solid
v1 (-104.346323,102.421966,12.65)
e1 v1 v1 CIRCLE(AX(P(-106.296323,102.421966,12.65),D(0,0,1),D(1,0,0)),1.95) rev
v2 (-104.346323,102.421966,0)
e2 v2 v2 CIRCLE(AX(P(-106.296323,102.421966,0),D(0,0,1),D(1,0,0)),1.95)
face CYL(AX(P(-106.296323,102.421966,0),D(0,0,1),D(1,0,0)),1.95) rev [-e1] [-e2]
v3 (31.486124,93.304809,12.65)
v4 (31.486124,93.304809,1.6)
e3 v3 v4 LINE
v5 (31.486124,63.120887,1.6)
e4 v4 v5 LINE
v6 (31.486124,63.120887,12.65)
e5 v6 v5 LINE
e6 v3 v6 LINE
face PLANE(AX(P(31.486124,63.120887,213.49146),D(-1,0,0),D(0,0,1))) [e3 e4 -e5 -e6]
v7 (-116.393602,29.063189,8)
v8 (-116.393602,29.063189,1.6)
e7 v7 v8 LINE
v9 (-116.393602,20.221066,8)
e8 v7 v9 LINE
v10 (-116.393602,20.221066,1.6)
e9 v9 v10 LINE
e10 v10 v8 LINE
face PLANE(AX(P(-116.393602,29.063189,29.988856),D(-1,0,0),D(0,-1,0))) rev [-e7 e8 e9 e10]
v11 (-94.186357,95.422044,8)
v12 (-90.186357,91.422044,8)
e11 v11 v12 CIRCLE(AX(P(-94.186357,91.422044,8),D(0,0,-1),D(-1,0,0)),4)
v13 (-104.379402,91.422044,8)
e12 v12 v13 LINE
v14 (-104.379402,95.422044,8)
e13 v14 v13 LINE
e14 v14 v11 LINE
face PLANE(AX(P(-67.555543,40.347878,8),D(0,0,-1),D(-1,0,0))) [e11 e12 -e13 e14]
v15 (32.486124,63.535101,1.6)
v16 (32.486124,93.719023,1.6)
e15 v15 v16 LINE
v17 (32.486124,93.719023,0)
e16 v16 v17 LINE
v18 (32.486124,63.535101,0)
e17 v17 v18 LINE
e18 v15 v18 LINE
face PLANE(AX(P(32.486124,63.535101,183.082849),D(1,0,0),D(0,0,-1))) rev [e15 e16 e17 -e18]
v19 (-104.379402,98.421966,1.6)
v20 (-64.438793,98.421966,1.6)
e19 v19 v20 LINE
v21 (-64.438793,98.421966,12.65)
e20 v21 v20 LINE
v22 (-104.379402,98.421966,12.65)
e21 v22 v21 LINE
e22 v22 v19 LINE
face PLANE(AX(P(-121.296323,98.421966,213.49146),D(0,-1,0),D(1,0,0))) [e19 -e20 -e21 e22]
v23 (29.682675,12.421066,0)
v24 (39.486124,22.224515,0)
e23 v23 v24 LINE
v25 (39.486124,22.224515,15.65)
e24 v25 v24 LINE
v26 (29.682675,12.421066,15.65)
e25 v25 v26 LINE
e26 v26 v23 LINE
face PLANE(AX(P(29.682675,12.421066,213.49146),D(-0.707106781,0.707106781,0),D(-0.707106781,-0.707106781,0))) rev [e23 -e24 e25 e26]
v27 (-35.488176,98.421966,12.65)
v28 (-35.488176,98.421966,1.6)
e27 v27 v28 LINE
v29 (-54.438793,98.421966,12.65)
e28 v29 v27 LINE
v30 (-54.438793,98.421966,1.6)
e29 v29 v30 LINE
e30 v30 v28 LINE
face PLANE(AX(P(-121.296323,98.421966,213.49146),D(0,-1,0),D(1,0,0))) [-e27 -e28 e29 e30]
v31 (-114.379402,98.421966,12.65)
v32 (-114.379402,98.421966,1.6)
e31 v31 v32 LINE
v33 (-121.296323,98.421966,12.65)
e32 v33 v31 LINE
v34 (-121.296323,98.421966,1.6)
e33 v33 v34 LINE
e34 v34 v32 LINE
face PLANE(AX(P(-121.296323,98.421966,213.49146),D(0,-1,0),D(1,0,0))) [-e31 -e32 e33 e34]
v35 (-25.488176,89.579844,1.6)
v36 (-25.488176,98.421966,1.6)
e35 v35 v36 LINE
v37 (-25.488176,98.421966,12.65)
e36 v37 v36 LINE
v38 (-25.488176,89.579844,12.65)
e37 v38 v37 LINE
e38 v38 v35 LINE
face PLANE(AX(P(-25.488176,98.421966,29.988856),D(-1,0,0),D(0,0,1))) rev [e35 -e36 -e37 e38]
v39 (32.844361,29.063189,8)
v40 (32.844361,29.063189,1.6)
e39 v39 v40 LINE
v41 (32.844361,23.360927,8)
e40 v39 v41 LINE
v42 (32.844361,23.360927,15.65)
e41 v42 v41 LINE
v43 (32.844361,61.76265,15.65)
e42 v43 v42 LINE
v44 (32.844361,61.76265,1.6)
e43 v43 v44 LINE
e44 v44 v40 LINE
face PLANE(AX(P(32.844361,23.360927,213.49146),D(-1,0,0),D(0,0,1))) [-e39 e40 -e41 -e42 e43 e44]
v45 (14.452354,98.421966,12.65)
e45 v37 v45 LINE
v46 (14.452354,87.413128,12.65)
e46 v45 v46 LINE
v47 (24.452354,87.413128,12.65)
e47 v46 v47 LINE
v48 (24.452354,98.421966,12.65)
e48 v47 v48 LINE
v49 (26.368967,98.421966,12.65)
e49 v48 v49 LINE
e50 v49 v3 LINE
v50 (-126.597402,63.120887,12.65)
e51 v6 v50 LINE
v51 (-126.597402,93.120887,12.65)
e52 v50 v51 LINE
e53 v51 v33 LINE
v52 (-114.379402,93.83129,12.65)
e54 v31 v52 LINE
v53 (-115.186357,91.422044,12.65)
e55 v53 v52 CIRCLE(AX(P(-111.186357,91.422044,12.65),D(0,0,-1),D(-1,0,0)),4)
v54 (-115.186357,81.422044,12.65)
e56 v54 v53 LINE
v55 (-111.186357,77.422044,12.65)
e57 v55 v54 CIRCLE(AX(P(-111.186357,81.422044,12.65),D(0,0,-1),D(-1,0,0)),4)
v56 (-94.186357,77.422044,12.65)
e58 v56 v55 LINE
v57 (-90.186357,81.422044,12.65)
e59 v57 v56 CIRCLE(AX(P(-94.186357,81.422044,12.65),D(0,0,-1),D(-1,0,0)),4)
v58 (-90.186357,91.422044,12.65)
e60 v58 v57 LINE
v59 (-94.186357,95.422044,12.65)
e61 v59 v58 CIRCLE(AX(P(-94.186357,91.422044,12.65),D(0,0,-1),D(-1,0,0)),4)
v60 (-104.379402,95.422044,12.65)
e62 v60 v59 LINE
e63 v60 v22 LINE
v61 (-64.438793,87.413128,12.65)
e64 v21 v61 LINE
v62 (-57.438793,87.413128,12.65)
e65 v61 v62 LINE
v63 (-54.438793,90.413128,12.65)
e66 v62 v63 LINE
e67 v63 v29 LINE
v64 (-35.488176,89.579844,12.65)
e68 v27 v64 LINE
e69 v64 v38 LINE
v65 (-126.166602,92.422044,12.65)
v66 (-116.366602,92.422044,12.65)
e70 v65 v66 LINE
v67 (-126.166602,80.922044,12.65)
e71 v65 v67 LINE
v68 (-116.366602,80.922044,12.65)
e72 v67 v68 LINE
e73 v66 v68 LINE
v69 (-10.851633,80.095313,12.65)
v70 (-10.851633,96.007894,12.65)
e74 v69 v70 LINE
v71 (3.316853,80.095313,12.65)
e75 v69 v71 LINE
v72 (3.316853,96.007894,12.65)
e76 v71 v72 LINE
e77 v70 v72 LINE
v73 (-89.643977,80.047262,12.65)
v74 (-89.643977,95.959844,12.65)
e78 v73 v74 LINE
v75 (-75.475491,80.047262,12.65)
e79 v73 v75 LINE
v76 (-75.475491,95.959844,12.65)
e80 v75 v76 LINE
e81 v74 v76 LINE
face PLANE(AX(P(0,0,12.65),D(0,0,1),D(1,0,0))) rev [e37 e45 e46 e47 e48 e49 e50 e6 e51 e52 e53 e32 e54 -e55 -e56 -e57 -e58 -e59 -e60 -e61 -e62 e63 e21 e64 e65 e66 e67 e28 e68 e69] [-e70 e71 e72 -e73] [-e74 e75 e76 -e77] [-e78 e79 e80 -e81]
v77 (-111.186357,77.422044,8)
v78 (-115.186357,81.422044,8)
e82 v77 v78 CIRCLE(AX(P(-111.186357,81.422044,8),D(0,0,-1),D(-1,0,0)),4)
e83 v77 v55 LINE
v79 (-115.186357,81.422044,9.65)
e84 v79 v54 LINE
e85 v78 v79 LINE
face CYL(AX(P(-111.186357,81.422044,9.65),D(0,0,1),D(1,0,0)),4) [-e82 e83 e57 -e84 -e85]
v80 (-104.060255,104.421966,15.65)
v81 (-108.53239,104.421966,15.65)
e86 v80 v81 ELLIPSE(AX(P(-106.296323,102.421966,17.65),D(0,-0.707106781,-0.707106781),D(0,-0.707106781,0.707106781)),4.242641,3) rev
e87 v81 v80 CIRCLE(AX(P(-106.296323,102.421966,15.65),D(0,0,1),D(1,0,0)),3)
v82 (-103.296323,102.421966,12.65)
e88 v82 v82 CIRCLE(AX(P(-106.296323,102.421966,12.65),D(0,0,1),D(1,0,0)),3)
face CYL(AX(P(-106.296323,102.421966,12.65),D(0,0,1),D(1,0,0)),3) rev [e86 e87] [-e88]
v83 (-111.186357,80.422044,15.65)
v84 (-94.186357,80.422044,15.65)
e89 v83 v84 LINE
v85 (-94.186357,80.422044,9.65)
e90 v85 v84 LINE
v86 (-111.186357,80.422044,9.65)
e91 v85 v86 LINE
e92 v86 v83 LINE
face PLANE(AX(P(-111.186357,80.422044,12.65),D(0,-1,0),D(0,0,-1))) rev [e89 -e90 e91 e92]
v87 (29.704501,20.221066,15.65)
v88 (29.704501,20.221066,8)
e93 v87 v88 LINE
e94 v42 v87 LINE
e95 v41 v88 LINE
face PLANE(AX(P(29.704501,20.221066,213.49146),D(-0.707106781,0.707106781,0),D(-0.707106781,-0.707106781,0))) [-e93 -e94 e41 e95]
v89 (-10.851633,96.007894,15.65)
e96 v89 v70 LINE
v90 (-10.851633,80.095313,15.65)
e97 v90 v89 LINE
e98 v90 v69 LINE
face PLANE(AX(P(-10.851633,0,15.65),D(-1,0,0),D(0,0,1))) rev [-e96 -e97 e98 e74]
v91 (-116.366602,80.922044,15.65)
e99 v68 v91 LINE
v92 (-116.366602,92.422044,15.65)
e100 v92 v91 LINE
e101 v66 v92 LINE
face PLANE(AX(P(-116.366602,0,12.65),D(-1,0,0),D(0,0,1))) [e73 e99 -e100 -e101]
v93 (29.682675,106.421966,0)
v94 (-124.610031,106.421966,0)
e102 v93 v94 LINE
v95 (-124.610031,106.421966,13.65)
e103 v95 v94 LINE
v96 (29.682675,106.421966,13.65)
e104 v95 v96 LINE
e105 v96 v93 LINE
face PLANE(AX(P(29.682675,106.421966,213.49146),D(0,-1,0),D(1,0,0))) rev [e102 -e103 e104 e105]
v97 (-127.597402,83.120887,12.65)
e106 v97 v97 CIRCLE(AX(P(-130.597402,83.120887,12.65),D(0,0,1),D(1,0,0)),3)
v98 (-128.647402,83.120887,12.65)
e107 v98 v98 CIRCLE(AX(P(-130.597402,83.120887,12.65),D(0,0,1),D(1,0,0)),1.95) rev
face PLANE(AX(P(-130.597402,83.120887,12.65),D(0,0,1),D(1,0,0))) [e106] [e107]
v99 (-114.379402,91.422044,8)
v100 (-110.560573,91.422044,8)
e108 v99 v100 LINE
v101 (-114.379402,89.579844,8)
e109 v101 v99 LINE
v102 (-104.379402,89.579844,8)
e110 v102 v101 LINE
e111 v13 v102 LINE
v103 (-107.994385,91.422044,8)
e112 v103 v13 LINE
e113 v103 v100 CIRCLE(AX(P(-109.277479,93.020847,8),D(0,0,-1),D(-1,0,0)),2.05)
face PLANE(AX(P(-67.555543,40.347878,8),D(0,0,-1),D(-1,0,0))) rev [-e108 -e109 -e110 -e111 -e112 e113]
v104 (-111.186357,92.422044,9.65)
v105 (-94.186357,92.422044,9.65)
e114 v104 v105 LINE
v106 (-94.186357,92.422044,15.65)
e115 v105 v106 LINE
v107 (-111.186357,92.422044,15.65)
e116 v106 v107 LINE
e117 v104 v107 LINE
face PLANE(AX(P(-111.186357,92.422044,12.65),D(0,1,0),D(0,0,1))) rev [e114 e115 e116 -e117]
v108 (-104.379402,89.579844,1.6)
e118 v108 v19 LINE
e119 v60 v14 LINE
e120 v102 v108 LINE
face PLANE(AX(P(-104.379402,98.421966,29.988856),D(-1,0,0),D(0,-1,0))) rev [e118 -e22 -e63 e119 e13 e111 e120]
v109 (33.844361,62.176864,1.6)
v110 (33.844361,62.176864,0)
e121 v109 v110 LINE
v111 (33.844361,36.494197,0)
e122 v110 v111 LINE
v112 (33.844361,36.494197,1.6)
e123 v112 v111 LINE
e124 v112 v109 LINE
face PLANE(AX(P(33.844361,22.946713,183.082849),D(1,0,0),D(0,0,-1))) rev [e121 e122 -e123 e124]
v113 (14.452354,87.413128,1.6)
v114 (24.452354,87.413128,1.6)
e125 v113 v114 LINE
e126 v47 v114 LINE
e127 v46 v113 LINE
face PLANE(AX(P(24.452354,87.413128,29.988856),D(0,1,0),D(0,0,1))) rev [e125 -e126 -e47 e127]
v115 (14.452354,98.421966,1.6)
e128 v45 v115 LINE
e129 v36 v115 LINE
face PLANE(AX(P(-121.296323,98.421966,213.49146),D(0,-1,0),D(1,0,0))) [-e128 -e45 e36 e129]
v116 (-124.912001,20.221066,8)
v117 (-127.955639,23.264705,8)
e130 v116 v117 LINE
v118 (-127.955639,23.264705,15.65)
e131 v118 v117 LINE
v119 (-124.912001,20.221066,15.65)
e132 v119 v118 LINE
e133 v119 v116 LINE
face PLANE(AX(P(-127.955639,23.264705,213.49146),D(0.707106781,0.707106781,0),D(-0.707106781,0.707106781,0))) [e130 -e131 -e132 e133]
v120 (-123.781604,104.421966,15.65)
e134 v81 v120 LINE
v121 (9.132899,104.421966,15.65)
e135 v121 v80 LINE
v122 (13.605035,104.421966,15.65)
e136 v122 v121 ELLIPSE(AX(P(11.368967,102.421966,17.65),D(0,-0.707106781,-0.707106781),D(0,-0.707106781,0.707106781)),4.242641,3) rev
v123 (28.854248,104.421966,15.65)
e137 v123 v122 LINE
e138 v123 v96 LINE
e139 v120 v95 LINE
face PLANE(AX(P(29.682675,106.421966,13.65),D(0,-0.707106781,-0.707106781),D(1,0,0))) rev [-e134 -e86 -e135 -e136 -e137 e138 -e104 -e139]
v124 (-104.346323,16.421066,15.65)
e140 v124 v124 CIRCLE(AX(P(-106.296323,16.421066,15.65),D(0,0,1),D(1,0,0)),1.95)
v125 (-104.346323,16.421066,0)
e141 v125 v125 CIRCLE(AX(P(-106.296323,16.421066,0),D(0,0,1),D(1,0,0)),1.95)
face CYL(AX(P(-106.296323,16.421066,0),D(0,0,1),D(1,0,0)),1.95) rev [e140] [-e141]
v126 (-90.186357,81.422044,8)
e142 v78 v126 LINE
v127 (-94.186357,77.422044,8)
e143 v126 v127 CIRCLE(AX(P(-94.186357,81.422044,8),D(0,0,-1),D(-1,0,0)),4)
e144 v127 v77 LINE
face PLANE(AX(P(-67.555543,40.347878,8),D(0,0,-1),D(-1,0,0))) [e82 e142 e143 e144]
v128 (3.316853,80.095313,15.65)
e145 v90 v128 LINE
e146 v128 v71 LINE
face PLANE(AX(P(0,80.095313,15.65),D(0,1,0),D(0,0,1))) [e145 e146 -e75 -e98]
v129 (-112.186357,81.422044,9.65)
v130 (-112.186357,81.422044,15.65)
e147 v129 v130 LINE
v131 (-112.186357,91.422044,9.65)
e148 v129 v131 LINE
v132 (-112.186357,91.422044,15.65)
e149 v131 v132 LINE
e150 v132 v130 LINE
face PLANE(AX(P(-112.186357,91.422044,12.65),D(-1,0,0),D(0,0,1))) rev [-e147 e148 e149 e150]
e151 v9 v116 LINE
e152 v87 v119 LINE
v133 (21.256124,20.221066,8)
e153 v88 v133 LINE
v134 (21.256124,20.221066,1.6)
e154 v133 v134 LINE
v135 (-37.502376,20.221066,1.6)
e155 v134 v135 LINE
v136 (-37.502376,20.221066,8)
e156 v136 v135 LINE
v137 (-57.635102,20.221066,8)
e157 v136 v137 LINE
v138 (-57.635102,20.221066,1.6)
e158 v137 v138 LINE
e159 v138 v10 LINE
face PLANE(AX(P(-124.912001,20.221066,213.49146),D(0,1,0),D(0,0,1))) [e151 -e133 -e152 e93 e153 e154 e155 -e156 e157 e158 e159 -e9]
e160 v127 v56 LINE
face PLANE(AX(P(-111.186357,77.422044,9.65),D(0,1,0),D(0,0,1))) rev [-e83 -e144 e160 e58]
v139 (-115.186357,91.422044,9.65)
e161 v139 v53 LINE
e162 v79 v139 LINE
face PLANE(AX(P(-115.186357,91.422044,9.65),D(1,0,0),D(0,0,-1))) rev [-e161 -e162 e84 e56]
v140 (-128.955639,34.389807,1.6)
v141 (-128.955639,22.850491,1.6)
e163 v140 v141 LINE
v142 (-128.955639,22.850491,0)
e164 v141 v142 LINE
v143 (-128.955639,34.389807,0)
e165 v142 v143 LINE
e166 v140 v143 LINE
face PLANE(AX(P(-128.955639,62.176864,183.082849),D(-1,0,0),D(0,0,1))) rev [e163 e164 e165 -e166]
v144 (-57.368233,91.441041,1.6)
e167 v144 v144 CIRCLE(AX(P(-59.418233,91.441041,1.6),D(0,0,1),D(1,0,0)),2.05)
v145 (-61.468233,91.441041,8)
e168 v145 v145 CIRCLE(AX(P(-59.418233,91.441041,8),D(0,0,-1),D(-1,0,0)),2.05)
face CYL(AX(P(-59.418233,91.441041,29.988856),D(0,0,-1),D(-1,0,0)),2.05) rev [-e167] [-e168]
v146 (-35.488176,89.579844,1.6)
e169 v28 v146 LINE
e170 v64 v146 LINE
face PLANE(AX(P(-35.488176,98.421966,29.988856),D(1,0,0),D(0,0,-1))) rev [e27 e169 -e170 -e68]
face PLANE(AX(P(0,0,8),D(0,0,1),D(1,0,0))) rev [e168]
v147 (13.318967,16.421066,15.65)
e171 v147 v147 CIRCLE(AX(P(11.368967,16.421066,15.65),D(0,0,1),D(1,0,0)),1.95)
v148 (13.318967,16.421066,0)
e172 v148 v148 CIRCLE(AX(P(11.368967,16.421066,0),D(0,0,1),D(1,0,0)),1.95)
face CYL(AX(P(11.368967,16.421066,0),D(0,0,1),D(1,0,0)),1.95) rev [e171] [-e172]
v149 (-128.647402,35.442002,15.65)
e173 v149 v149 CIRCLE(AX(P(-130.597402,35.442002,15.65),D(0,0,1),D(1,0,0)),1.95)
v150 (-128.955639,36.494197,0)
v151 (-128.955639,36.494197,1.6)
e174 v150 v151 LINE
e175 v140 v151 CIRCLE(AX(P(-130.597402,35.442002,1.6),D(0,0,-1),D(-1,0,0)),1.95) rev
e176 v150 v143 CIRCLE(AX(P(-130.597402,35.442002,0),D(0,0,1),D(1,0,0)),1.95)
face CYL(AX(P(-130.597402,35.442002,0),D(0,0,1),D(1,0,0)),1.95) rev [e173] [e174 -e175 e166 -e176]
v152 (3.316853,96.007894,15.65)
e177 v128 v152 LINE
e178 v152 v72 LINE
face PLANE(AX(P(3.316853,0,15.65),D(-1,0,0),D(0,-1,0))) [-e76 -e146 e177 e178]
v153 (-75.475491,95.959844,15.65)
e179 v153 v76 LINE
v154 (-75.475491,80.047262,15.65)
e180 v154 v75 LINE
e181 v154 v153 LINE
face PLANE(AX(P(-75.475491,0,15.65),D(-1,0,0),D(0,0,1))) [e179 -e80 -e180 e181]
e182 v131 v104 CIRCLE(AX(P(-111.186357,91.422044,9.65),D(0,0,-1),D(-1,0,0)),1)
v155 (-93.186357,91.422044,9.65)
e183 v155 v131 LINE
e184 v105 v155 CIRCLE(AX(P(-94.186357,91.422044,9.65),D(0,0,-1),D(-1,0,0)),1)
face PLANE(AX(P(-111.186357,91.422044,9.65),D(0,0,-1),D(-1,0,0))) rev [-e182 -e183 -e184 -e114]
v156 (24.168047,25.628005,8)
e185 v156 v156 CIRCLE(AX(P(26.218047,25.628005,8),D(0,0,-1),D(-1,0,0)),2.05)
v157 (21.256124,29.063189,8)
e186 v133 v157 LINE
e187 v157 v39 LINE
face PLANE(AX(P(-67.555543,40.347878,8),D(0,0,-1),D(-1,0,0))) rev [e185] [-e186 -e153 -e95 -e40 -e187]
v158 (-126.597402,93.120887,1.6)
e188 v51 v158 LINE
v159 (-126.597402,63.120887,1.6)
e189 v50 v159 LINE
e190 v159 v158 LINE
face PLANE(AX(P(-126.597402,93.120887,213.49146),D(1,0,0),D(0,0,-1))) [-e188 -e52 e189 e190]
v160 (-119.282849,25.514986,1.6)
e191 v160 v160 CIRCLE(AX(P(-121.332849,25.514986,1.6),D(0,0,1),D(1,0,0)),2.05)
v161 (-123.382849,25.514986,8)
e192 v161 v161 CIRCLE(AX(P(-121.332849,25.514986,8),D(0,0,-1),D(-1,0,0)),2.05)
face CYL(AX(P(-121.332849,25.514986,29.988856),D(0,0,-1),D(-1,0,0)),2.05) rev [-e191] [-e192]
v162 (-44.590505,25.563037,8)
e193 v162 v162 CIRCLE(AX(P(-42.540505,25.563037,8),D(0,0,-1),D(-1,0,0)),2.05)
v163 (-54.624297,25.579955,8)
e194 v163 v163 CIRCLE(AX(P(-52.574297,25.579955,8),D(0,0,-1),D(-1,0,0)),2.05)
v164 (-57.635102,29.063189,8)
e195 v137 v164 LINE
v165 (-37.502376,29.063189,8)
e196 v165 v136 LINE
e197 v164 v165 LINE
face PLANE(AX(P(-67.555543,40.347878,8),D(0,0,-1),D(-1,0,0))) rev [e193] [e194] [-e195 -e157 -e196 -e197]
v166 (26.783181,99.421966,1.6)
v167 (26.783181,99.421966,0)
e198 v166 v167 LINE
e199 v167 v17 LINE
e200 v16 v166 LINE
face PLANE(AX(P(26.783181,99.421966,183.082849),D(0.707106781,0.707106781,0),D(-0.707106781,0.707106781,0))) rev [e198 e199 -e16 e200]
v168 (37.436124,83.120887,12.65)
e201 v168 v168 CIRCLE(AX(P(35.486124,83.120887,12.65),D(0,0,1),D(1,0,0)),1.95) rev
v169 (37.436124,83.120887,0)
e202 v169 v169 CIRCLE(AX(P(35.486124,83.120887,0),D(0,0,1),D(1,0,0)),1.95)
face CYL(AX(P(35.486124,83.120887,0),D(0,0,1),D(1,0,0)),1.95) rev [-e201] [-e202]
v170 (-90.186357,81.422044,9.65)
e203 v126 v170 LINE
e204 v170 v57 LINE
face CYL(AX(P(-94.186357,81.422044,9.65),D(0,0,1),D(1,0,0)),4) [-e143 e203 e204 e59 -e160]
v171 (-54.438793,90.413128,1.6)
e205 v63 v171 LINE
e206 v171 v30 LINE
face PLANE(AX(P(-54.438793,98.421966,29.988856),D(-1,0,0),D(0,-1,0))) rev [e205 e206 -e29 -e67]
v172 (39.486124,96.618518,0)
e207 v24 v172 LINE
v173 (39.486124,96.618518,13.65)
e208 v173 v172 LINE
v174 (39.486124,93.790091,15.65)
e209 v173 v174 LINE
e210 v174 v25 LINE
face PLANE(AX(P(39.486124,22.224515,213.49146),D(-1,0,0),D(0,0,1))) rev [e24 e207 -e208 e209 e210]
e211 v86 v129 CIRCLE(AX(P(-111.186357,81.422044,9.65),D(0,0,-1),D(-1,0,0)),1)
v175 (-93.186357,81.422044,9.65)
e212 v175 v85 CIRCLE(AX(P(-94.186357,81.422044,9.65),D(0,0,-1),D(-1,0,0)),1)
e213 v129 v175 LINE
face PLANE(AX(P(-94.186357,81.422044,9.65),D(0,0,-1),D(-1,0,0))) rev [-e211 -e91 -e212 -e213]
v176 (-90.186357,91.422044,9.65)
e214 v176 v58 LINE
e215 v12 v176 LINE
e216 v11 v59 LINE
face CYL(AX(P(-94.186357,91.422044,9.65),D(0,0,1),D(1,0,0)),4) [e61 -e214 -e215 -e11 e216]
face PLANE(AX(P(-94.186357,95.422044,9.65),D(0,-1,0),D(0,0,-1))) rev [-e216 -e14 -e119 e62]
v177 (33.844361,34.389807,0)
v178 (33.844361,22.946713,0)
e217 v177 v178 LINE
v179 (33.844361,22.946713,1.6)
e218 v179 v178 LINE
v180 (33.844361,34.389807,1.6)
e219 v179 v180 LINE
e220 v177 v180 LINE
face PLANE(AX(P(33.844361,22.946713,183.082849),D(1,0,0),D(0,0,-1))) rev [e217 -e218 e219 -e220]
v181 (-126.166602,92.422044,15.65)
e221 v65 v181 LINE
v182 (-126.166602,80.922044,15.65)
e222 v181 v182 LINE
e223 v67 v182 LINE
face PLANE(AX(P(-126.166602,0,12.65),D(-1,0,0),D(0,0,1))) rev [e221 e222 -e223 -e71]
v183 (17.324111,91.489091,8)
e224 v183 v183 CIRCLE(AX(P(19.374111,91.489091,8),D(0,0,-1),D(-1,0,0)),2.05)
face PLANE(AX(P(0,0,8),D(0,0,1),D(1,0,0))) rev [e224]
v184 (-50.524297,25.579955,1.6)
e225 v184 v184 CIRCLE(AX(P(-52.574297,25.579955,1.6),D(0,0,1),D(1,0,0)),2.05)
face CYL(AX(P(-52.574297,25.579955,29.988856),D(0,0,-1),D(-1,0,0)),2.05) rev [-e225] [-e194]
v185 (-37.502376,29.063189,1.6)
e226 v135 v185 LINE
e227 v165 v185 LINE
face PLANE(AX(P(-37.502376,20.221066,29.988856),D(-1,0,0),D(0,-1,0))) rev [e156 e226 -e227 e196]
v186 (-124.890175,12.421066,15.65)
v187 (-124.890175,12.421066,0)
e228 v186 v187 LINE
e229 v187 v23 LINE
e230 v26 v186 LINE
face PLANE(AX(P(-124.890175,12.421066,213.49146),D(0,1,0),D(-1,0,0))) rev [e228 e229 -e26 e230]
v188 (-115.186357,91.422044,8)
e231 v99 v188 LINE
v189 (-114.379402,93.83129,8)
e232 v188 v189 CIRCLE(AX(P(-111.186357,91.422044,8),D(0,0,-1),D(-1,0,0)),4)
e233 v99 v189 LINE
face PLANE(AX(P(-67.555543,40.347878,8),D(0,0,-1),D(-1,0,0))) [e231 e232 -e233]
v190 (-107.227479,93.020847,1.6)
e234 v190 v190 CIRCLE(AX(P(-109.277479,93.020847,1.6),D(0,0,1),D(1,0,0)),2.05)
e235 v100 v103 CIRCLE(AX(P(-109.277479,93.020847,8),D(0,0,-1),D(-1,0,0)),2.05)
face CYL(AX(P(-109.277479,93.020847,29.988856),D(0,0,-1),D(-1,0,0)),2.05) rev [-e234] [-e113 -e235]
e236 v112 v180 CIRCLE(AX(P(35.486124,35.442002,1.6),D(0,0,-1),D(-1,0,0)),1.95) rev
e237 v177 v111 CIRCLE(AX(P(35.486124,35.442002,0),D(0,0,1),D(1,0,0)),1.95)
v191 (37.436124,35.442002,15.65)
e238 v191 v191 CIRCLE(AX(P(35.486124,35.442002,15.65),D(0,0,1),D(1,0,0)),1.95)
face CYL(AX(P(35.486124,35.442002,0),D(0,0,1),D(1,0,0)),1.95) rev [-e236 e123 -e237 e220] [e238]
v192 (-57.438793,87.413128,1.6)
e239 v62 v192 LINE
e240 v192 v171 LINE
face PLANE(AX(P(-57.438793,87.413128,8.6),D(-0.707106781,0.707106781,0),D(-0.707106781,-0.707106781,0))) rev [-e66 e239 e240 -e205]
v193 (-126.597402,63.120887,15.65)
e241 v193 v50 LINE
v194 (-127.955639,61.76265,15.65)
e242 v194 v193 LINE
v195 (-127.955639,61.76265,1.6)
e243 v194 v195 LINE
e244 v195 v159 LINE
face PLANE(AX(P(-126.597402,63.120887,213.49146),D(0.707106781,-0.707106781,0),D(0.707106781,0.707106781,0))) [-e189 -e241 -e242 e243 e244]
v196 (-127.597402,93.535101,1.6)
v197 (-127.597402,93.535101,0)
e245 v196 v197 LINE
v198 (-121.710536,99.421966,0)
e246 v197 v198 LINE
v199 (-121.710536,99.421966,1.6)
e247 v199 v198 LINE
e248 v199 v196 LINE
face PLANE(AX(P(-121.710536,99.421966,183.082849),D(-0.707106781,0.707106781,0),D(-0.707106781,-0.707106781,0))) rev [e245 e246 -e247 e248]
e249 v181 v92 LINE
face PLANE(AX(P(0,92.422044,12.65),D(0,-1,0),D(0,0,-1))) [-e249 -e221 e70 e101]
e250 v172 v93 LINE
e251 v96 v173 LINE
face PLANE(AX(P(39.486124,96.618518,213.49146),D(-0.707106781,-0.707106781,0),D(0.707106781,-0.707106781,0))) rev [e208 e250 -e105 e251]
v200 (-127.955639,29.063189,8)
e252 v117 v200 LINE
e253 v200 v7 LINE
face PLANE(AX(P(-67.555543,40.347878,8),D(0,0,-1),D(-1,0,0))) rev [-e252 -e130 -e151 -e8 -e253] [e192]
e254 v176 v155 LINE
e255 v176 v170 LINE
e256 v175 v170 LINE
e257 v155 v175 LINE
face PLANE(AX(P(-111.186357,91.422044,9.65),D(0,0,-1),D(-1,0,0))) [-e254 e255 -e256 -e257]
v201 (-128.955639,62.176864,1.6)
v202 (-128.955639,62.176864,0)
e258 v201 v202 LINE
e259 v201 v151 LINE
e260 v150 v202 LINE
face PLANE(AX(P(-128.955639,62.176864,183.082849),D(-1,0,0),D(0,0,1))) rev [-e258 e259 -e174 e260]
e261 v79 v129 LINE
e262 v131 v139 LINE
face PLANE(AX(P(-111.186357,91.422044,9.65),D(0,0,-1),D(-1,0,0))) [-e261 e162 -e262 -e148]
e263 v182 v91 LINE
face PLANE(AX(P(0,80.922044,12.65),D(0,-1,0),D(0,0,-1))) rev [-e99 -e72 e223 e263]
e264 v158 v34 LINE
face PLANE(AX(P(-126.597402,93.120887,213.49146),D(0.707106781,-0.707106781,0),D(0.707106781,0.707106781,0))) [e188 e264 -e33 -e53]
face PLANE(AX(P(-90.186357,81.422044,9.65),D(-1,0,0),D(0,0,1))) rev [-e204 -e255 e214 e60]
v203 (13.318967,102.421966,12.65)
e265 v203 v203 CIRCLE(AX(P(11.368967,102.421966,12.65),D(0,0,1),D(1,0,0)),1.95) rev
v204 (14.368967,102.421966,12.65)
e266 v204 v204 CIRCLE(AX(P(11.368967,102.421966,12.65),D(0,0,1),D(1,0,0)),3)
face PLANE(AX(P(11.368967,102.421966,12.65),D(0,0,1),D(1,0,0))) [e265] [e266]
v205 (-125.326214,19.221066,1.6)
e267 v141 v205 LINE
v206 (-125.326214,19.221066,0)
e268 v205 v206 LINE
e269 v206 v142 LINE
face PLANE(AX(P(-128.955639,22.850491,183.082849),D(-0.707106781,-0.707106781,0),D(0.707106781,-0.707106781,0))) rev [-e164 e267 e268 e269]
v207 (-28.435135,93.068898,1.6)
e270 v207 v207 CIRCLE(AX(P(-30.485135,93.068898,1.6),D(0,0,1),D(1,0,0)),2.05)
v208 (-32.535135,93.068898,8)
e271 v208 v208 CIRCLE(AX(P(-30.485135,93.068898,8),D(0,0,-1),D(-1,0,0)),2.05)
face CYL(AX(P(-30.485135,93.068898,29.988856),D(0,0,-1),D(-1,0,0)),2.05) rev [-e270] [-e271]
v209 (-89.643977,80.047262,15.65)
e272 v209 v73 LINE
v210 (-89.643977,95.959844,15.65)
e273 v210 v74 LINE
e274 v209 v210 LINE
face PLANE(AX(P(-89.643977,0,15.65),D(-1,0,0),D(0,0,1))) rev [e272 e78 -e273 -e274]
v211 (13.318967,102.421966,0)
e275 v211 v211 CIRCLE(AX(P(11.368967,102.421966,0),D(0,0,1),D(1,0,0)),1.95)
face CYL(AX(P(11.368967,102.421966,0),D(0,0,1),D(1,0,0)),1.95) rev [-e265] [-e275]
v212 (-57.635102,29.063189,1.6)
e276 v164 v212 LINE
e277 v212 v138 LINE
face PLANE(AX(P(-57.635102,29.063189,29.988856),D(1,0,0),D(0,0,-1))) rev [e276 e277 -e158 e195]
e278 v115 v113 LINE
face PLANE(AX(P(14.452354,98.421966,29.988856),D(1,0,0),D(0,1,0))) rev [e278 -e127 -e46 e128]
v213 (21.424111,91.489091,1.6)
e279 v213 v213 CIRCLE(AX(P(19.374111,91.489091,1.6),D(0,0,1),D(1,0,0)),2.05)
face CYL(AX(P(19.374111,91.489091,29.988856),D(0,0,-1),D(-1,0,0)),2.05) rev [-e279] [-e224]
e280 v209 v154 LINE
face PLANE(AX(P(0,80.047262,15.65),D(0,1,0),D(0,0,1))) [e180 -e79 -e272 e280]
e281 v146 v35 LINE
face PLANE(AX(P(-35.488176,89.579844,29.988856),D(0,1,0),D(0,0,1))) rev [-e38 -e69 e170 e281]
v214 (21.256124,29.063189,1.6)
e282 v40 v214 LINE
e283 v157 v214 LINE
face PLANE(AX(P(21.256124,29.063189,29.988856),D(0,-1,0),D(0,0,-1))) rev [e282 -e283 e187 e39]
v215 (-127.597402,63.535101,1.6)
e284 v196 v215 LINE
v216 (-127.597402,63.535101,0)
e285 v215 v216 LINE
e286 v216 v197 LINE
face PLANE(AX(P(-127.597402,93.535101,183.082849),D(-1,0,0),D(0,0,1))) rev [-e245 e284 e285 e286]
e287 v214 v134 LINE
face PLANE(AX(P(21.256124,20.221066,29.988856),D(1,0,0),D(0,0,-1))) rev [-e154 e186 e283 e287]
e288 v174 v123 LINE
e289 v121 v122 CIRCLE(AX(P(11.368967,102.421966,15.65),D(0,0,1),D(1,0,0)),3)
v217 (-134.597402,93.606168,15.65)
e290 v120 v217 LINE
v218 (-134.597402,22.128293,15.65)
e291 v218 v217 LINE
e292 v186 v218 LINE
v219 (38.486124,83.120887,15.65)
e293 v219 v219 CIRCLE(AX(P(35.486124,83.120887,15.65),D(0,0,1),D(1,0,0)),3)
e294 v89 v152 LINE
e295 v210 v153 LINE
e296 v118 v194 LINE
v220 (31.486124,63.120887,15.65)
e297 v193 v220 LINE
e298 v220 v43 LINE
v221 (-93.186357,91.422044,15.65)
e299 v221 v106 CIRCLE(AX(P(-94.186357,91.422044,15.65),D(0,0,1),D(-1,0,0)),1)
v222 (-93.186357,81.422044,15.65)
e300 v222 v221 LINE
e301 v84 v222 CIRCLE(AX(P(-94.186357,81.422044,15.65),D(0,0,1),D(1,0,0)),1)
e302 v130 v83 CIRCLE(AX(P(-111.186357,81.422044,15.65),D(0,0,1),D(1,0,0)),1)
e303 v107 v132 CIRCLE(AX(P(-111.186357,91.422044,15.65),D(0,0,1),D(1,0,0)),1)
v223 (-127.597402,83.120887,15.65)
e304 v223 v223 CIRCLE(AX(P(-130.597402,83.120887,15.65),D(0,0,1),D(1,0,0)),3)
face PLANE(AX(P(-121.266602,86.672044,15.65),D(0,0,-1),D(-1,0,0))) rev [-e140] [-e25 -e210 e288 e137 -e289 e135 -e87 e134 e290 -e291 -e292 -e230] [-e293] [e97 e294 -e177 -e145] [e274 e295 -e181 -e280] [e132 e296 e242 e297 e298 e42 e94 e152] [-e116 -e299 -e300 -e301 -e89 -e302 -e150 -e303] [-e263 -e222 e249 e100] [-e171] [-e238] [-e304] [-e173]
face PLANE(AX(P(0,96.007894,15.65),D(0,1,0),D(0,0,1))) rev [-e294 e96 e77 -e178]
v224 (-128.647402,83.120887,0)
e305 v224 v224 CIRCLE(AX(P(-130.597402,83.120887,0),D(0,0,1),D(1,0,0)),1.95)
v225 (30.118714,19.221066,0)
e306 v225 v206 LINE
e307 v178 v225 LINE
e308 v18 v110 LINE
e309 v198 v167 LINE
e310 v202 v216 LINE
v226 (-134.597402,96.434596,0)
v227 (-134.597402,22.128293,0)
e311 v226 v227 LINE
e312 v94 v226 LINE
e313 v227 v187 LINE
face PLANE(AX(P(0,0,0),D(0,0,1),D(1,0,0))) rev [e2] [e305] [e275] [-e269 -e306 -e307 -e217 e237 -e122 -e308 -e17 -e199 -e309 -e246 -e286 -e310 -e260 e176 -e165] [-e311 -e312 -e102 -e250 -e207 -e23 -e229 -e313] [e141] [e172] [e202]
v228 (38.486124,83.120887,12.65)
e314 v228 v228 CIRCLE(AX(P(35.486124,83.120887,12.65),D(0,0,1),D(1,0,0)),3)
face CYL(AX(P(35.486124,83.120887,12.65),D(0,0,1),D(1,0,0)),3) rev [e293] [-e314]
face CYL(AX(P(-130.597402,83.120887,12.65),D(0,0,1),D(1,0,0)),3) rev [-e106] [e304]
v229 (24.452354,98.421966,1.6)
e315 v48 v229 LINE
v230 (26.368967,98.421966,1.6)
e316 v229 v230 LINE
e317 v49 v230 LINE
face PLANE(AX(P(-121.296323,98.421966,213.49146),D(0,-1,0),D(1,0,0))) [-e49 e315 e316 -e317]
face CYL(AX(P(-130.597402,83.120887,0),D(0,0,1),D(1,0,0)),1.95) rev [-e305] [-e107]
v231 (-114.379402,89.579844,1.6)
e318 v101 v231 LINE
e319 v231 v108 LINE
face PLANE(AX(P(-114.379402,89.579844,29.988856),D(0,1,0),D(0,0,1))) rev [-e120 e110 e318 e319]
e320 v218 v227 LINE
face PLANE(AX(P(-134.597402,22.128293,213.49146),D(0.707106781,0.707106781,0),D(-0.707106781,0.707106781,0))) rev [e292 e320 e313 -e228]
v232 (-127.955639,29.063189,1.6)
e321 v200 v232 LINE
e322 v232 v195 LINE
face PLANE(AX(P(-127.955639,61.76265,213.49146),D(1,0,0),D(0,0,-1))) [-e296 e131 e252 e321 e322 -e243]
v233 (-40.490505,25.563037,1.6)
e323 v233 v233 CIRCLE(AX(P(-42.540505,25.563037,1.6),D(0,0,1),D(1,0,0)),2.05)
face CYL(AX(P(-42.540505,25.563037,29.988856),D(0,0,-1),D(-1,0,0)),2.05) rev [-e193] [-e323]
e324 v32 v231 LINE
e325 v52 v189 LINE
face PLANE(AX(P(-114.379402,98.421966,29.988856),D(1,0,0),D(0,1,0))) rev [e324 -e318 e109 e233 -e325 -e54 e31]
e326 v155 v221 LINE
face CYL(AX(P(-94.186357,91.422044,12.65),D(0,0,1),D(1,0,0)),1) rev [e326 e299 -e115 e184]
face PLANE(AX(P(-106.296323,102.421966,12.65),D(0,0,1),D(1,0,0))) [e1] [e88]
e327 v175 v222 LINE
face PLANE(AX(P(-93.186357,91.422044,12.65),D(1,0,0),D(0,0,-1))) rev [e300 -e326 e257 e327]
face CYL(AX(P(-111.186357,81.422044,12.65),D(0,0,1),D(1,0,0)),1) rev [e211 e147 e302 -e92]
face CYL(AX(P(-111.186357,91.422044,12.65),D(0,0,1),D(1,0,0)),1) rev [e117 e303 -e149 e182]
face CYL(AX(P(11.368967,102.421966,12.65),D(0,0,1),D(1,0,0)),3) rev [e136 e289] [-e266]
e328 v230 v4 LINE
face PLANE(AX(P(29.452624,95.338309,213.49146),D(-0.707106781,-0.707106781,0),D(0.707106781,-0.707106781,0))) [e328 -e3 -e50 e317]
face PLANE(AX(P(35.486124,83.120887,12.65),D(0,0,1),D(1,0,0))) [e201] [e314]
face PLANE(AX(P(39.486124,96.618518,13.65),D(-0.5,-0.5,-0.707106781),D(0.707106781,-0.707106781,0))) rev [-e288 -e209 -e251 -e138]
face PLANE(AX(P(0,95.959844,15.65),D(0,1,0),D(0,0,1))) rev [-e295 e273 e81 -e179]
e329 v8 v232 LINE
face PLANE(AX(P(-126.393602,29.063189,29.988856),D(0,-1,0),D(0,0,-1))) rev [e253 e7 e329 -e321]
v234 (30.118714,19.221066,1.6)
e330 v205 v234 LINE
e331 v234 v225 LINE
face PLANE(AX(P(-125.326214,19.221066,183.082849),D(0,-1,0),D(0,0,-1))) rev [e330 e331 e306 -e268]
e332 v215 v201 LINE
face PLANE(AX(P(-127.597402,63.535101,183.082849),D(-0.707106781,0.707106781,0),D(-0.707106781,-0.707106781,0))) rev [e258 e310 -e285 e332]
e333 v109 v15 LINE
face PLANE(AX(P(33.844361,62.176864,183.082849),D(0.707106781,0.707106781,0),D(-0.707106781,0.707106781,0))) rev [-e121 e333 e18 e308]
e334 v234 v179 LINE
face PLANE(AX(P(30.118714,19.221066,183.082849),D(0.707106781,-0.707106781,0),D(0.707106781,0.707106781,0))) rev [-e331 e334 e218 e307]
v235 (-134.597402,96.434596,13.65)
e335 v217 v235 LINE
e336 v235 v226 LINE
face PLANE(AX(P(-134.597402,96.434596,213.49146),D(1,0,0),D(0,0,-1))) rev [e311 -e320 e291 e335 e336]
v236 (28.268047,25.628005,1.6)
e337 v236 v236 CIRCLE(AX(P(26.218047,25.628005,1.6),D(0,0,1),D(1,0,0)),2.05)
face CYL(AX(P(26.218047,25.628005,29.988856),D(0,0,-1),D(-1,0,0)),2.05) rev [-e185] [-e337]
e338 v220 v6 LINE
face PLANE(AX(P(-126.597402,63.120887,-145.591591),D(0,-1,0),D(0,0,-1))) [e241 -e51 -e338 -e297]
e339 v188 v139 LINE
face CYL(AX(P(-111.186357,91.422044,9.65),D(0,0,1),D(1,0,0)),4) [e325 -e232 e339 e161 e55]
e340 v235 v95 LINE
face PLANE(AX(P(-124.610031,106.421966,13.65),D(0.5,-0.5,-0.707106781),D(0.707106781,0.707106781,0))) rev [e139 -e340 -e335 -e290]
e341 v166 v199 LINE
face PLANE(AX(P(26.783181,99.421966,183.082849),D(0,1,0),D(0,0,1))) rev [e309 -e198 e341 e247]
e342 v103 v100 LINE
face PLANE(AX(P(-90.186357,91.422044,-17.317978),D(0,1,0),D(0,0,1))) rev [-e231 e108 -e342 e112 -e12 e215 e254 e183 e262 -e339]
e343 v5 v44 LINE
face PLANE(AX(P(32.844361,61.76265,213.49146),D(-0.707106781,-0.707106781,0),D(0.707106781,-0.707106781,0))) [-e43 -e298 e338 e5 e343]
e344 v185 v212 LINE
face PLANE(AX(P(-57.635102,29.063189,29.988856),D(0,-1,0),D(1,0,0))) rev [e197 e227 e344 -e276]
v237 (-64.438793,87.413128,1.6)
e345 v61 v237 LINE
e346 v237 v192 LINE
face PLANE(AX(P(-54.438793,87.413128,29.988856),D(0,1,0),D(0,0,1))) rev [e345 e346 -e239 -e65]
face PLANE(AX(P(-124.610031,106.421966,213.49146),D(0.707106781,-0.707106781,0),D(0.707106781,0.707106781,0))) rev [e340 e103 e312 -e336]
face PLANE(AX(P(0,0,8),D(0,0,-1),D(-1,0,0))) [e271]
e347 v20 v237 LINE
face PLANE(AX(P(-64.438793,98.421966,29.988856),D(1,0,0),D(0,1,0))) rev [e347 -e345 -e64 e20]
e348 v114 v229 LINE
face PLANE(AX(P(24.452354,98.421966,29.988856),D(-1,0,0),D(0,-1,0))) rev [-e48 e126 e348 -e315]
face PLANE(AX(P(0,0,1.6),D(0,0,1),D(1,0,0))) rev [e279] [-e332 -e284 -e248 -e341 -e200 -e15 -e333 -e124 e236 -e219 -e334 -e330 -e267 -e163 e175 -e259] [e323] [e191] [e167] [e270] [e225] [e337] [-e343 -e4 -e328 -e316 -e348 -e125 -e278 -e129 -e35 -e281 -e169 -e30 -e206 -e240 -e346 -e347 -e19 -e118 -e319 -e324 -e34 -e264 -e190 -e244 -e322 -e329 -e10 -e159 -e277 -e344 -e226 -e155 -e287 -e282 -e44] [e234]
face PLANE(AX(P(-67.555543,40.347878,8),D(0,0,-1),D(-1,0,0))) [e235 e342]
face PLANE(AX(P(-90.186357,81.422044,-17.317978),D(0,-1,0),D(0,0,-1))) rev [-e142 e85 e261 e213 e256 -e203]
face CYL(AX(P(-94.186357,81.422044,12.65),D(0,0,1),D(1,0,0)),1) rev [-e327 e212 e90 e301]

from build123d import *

# Parameters (mm, degrees)
EXTRUDE_1_DEPTH     = 15.65
SKETCH_4_W          = 9.8
SKETCH_4_H          = 11.5
SKETCH_4_W_2        = 12.96
SKETCH_4_H_2        = 14.97
EXTRUDE_4_DEPTH     = 3
SKETCH_5_R          = 1.95
CUT_EXTRUDE_1_DEPTH = 173.299210828
SKETCH_6_R          = 3
CUT_EXTRUDE_2_DEPTH = 3
SKETCH_9_W          = 10
SKETCH_9_H          = 8.842122099
SKETCH_9_R          = 2.05
SKETCH_9_H_2        = 11.008838114
EXTRUDE_5_DEPTH     = 6.4
CUT_EXTRUDE_3_DEPTH = 3
EXTRUDE_6_DEPTH     = 3
EXTRUDE_7_DEPTH     = 1.65
CHAMFER_2_SIZE      = 2
CUT_EXTRUDE_4_DEPTH = 1.6
SKETCH_14_W         = 158.083526154
SKETCH_14_H         = 7.071067811
EXTRUDE_8_DEPTH     = 3
CUT_EXTRUDE_5_DEPTH = 7
EXTRUDE_START       = 4.65
SKETCH_16_W         = 10
SKETCH_16_H         = 11.008838114
SKETCH_16_H_2       = 8.842122099
EXTRUDE_9_DEPTH     = 4.65
SKETCH_18_W         = 12.96
SKETCH_18_H         = 14.97
EXTRUDE_10_DEPTH    = 3
SKETCH_19_W         = 14.168486711
SKETCH_19_H         = 15.912581757
SKETCH_19_W_2       = 12.168486711
SKETCH_19_H_2       = 13.912581757
SKETCH_19_H_3       = 15.912581758
SKETCH_19_H_4       = 13.912581758
CUT_EXTRUDE_6_DEPTH = 173.052660694


with BuildPart() as part:
    # 草图1 → 凸台-拉伸1 (new body)
    with BuildSketch(Plane.XY):
        Polygon((-134.597401901, 96.434595611), (-134.597401901, 22.128293189), (-124.890175211, 12.421066499), (29.682675464, 12.421066499), (39.486124253, 22.224515288), (39.486124253, 96.618517711), (29.682675464, 106.421966499), (-124.610031013, 106.421966499), align=None)
        Polygon((-125.038101901, 94.680187113), (-121.296322514, 98.421966499), (26.368966965, 98.421966499), (29.452624253, 95.338309212), (31.486124253, 93.304809212), (31.486124253, 63.120887113), (32.844361176, 61.762650189), (32.844361176, 23.360926804), (29.704500871, 20.221066499), (-124.912000618, 20.221066499), (-127.955638824, 23.264704705), (-127.955638824, 61.762650189), (-126.597401901, 63.120887113), (-126.597401901, 93.120887113), align=None, mode=Mode.SUBTRACT)
    extrude(amount=EXTRUDE_1_DEPTH)

    # 草图5 → 切除-拉伸1 (cut, through all)
    with BuildSketch(Plane.XY.offset(15.65)):
        with Locations((-106.296322514, 102.421966499)):
            Circle(SKETCH_5_R)
        with Locations((11.368966965, 102.421966499)):
            Circle(SKETCH_5_R)
        with Locations((35.486124253, 83.120887113)):
            Circle(SKETCH_5_R)
        with Locations((35.486124253, 35.442001688)):
            Circle(SKETCH_5_R)
        with Locations((11.368966965, 16.421066499)):
            Circle(SKETCH_5_R)
        with Locations((-106.296322514, 16.421066499)):
            Circle(SKETCH_5_R)
        with Locations((-130.597401901, 35.442001688)):
            Circle(SKETCH_5_R)
        with Locations((-130.597401901, 83.120887113)):
            Circle(SKETCH_5_R)
    extrude(amount=-CUT_EXTRUDE_1_DEPTH, mode=Mode.SUBTRACT)

    # 草图6 → 切除-拉伸2 (cut)
    with BuildSketch(Plane.XY.offset(15.65)):
        with Locations((-130.597401901, 83.120887113)):
            Circle(SKETCH_6_R)
        with Locations((-106.296322514, 102.421966499)):
            Circle(SKETCH_6_R)
        with Locations((11.368966965, 102.421966499)):
            Circle(SKETCH_6_R)
        with Locations((35.486124253, 83.120887113)):
            Circle(SKETCH_6_R)
    extrude(amount=-CUT_EXTRUDE_2_DEPTH, mode=Mode.SUBTRACT)

    # 草图9 → 凸台-拉伸5 (add)
    # profile 1 of 7: a face of its own
    with BuildSketch(Plane.XY.offset(1.6)):
        with Locations((-109.379401901, 94.00090545)):
            Rectangle(SKETCH_9_W, SKETCH_9_H)
        with Locations(Location((-109.277479202, 93.020847168, 0), (0, 0, 180))):
            Circle(SKETCH_9_R, mode=Mode.SUBTRACT)
    # profile 2 of 7: a face of its own
    with BuildSketch(Plane.XY.offset(1.6)):
        Polygon((-47.635101901, 29.063188599), (-47.502375747, 29.063188599), (-37.502375747, 29.063188599), (-37.502375747, 20.221066499), (-47.635101901, 20.221066499), (-57.635101901, 20.221066499), (-57.635101901, 29.063188599), align=None)
        with Locations(Location((-52.57429681, 25.579954761, 0), (0, 0, 180))):
            Circle(SKETCH_9_R, mode=Mode.SUBTRACT)
        with Locations(Location((-42.540505261, 25.563037191, 0), (0, 0, 180))):
            Circle(SKETCH_9_R, mode=Mode.SUBTRACT)
    # profile 3 of 7: a face of its own
    with BuildSketch(Plane.XY.offset(1.6)):
        with Locations((-30.488175747, 94.00090545)):
            Rectangle(SKETCH_9_W, SKETCH_9_H)
        with Locations(Location((-30.485135247, 93.068897898, 0), (0, 0, 180))):
            Circle(SKETCH_9_R, mode=Mode.SUBTRACT)
    # profile 4 of 7: a face of its own
    with BuildSketch(Plane.XY.offset(1.6)):
        Polygon((-126.393601901, 29.063188599), (-116.393601901, 29.063188599), (-116.393601901, 20.221066499), (-124.912000618, 20.221066499), (-127.955638824, 23.264704705), (-127.955638824, 29.063188599), align=None)
        with Locations(Location((-121.332849216, 25.514986462, 0), (0, 0, 180))):
            Circle(SKETCH_9_R, mode=Mode.SUBTRACT)
    # profile 5 of 7: a face of its own
    with BuildSketch(Plane.XY.offset(1.6)):
        Polygon((21.256124253, 20.221066499), (21.256124253, 29.063188599), (31.256124253, 29.063188599), (32.844361176, 29.063188599), (32.844361176, 23.360926804), (29.704500871, 20.221066499), align=None)
        with Locations(Location((26.218047145, 25.62800549, 0), (0, 0, 180))):
            Circle(SKETCH_9_R, mode=Mode.SUBTRACT)
    # profile 6 of 7: a face of its own
    with BuildSketch(Plane.XY.offset(1.6)):
        with Locations((19.452353698, 92.917547442)):
            Rectangle(SKETCH_9_W, SKETCH_9_H_2)
        with Locations(Location((19.374110595, 91.489091443, 0), (0, 0, 180))):
            Circle(SKETCH_9_R, mode=Mode.SUBTRACT)
    # profile 7 of 7: a face of its own
    with BuildSketch(Plane.XY.offset(1.6)):
        with Locations((-59.438793215, 92.917547442)):
            Rectangle(SKETCH_9_W, SKETCH_9_H_2)
        with Locations(Location((-59.41823336, 91.441040714, 0), (0, 0, 180))):
            Circle(SKETCH_9_R, mode=Mode.SUBTRACT)
    extrude(amount=EXTRUDE_5_DEPTH)



with BuildPart() as body_2:
    # 草图4 → 凸台-拉伸4 (new body)
    with BuildSketch(Plane.XY.offset(15.65)):
        Polygon((-126.597401901, 70.191954924), (31.286124253, 70.191954924), (31.486124253, 70.191954924), (31.486124253, 93.304809212), (26.368966965, 98.421966499), (-121.296322514, 98.421966499), (-126.597401901, 93.120887113), align=None)
        with Locations((-121.266601901, 86.6720444)):
            Rectangle(SKETCH_4_W, SKETCH_4_H, mode=Mode.SUBTRACT)
        with Locations((-82.658601901, 88.1620444)):
            Rectangle(SKETCH_4_W_2, SKETCH_4_H_2, mode=Mode.SUBTRACT)
        with Locations((-3.767375747, 88.258266499)):
            Rectangle(SKETCH_4_W_2, SKETCH_4_H_2, mode=Mode.SUBTRACT)
    extrude(amount=-EXTRUDE_4_DEPTH)

    # 草图10 → 切除-拉伸3 (cut)
    with BuildSketch(Plane.XY.offset(15.65)):
        with BuildLine():
            Line((-111.186356688, 92.4220444), (-94.186356688, 92.4220444))
            ThreePointArc((-94.186356688, 92.4220444), (-93.479249906, 92.129151181), (-93.186356688, 91.4220444))
            Line((-93.186356688, 91.4220444), (-93.186356688, 81.4220444))
            ThreePointArc((-93.186356688, 81.4220444), (-93.479249906, 80.714937619), (-94.186356688, 80.4220444))
            Line((-94.186356688, 80.4220444), (-111.186356688, 80.4220444))
            ThreePointArc((-111.186356688, 80.4220444), (-111.893463469, 80.714937619), (-112.186356688, 81.4220444))
            Line((-112.186356688, 81.4220444), (-112.186356688, 91.4220444))
            ThreePointArc((-112.186356688, 91.4220444), (-111.893463469, 92.129151181), (-111.186356688, 92.4220444))
        make_face()
    extrude(amount=-CUT_EXTRUDE_3_DEPTH, mode=Mode.SUBTRACT)


with BuildPart() as part_1:
    add(part.part)

    add(body_2.part)  # 凸台-拉伸6 merges body 2
    # 草图11 → 凸台-拉伸6 (add)
    with BuildSketch(Plane(origin=(0, 0, 12.65), x_dir=(-1, 0, 0), z_dir=(0, 0, -1))):
        with BuildLine():
            Line((115.186356688, 91.4220444), (115.186356688, 81.4220444))
            ThreePointArc((115.186356688, 81.4220444), (114.014783812, 78.593617275), (111.186356688, 77.4220444))
            Line((111.186356688, 77.4220444), (94.186356688, 77.4220444))
            ThreePointArc((94.186356688, 77.4220444), (91.357929563, 78.593617275), (90.186356688, 81.4220444))
            Line((90.186356688, 81.4220444), (90.186356688, 91.4220444))
            ThreePointArc((90.186356688, 91.4220444), (91.357929563, 94.250471525), (94.186356688, 95.4220444))
            Line((94.186356688, 95.4220444), (111.186356688, 95.4220444))
            ThreePointArc((111.186356688, 95.4220444), (114.014783812, 94.250471525), (115.186356688, 91.4220444))
        make_face()
        with BuildLine():
            Line((112.186356688, 91.4220444), (112.186356688, 81.4220444))
            ThreePointArc((112.186356688, 81.4220444), (111.893463469, 80.714937619), (111.186356688, 80.4220444))
            Line((111.186356688, 80.4220444), (94.186356688, 80.4220444))
            ThreePointArc((94.186356688, 80.4220444), (93.479249906, 80.714937619), (93.186356688, 81.4220444))
            Line((93.186356688, 81.4220444), (93.186356688, 91.4220444))
            ThreePointArc((93.186356688, 91.4220444), (93.479249906, 92.129151181), (94.186356688, 92.4220444))
            Line((94.186356688, 92.4220444), (111.186356688, 92.4220444))
            ThreePointArc((111.186356688, 92.4220444), (111.893463469, 92.129151181), (112.186356688, 91.4220444))
        make_face(mode=Mode.SUBTRACT)
    extrude(amount=EXTRUDE_6_DEPTH)

    # 草图12 → 凸台-拉伸7 (add)
    with BuildSketch(Plane(origin=(0, 0, 9.65), x_dir=(-1, 0, 0), z_dir=(0, 0, -1))):
        with BuildLine():
            Line((90.186356688, 81.4220444), (115.186356688, 81.4220444))
            ThreePointArc((115.186356688, 81.4220444), (114.014783812, 78.593617275), (111.186356688, 77.4220444))
            Line((111.186356688, 77.4220444), (94.186356688, 77.4220444))
            ThreePointArc((94.186356688, 77.4220444), (91.357929563, 78.593617275), (90.186356688, 81.4220444))
        make_face()
        with BuildLine():
            Line((90.186356688, 91.4220444), (115.186356688, 91.4220444))
            ThreePointArc((115.186356688, 91.4220444), (114.014783812, 94.250471525), (111.186356688, 95.4220444))
            Line((111.186356688, 95.4220444), (94.186356688, 95.4220444))
            ThreePointArc((94.186356688, 95.4220444), (91.357929563, 94.250471525), (90.186356688, 91.4220444))
        make_face()
    extrude(amount=EXTRUDE_7_DEPTH)

    # 倒角2
    # the kernel refuses this chamfer: 2 mm, written as the material it takes off along each edge
    with BuildSketch(Plane(origin=(-120.973122053, 110.058875459, 15.65), x_dir=(0.7068394360706736, -0.7068394360706736, 0.027495876610586428), z_dir=(-0.7071067811865476, -0.7071067811865476, 0))) as chamfer_2_piece_1:
        Polygon((CHAMFER_2_SIZE * 0.999621916911, -CHAMFER_2_SIZE * 0.0274958766106), (-CHAMFER_2_SIZE * 0.0274958766106, -CHAMFER_2_SIZE * 0.999621916911), (0, 0), align=None)
    extrude(amount=24.411007314, mode=Mode.SUBTRACT)
    with BuildSketch(Plane(origin=(43.123033212, 92.981608751, 15.65), x_dir=(-0.7068394360706716, -0.7068394360706755, 0.027495876610586494), z_dir=(-0.7071067811865495, 0.7071067811865456, 0))) as chamfer_2_piece_2:
        Polygon((CHAMFER_2_SIZE * 0.999621916911, -CHAMFER_2_SIZE * 0.0274958766106), (-CHAMFER_2_SIZE * 0.0274958766106, -CHAMFER_2_SIZE * 0.999621916911), (0, 0), align=None)
    extrude(amount=24.150902187, mode=Mode.SUBTRACT)
    with BuildSketch(Plane(origin=(34.82604144, 106.421966499, 15.65), x_dir=(0, -0.9996219169112968, 0.027495876610586414), z_dir=(-1, 0, 0))) as chamfer_2_piece_3:
        Polygon((CHAMFER_2_SIZE * 0.999621916911, -CHAMFER_2_SIZE * 0.0274958766106), (-CHAMFER_2_SIZE * 0.0274958766106, -CHAMFER_2_SIZE * 0.999621916911), (0, 0), align=None)
    extrude(amount=164.579438429, mode=Mode.SUBTRACT)

    # 草图13 → 切除-拉伸4 (cut)
    with BuildSketch(Plane(origin=(0, 0, 0), x_dir=(-1, 0, 0), z_dir=(0, 0, -1))):
        Polygon((-33.844361176, 22.946713242), (-33.844361176, 62.176863751), (-32.486124253, 63.535100675), (-32.486124253, 93.719022774), (-26.783180527, 99.421966499), (121.710536076, 99.421966499), (127.597401901, 93.535100675), (127.597401901, 63.535100675), (128.955638824, 62.176863751), (128.955638824, 22.850491143), (125.326214181, 19.221066499), (-30.118714433, 19.221066499), align=None)
    extrude(amount=-CUT_EXTRUDE_4_DEPTH, mode=Mode.SUBTRACT)

    # 草图14 → 凸台-拉伸8 (add)
    with BuildSketch(Plane.XY.offset(15.65)):
        with Locations((-47.555638824, 66.656421018)):
            Rectangle(SKETCH_14_W, SKETCH_14_H)
    extrude(amount=-EXTRUDE_8_DEPTH)

    # 草图15 → 切除-拉伸5 (cut)
    with BuildSketch(Plane(origin=(0, 0, 1.6), x_dir=(-1, 0, 0), z_dir=(0, 0, -1))):
        Polygon((54.438793215, 90.413128385), (54.438793215, 87.413128385), (57.438793215, 87.413128385), align=None)
    extrude(amount=-CUT_EXTRUDE_5_DEPTH, mode=Mode.SUBTRACT)

    # 草图16 → 凸台-拉伸9 (add)
    with BuildSketch(Plane.XY.offset(8).offset(EXTRUDE_START)):
        with Locations((19.452353698, 92.917547442)):
            Rectangle(SKETCH_16_W, SKETCH_16_H)
        Polygon((-54.438793215, 98.421966499), (-64.438793215, 98.421966499), (-64.438793215, 87.413128385), (-57.438793215, 87.413128385), (-54.438793215, 90.413128385), align=None)
        with Locations((-30.488175747, 94.00090545)):
            Rectangle(SKETCH_16_W, SKETCH_16_H_2)
        with BuildLine():
            Line((-104.379401901, 98.421966499), (-104.379401901, 95.4220444))
            Line((-104.379401901, 95.4220444), (-111.186356688, 95.4220444))
            ThreePointArc((-111.186356688, 95.4220444), (-112.970035377, 95.002336334), (-114.379401901, 93.831289566))
            Line((-114.379401901, 93.831289566), (-114.379401901, 98.421966499))
            Line((-114.379401901, 98.421966499), (-104.379401901, 98.421966499))
        make_face()
    extrude(amount=-EXTRUDE_9_DEPTH)

    # 草图18 → 凸台-拉伸10 (add)
    with BuildSketch(Plane.XY.offset(15.65)):
        with Locations((-3.767375747, 88.258266499)):
            Rectangle(SKETCH_18_W, SKETCH_18_H)
        with Locations((-82.658601901, 88.1620444)):
            Rectangle(SKETCH_18_W, SKETCH_18_H)
    extrude(amount=-EXTRUDE_10_DEPTH)

    # 草图19 → 切除-拉伸6 (cut, through all)
    # profile 1 of 4: a face of its own
    with BuildSketch(Plane(origin=(0, 0, 12.65), x_dir=(-1, 0, 0), z_dir=(0, 0, -1))):
        with Locations((82.55973398, 88.003552687)):
            Rectangle(SKETCH_19_W, SKETCH_19_H)
        with Locations((82.55973398, 88.003552687)):
            Rectangle(SKETCH_19_W_2, SKETCH_19_H_2, mode=Mode.SUBTRACT)
    # profile 2 of 4: a face of its own
    with BuildSketch(Plane(origin=(0, 0, 12.65), x_dir=(-1, 0, 0), z_dir=(0, 0, -1))):
        with Locations((82.55973398, 88.003552687)):
            Rectangle(SKETCH_19_W_2, SKETCH_19_H_2)
    # profile 3 of 4: a face of its own
    with BuildSketch(Plane(origin=(0, 0, 12.65), x_dir=(-1, 0, 0), z_dir=(0, 0, -1))):
        with Locations((3.767390026, 88.051603416)):
            Rectangle(SKETCH_19_W, SKETCH_19_H_3)
        with Locations((3.767390026, 88.051603416)):
            Rectangle(SKETCH_19_W_2, SKETCH_19_H_4, mode=Mode.SUBTRACT)
    # profile 4 of 4: a face of its own
    with BuildSketch(Plane(origin=(0, 0, 12.65), x_dir=(-1, 0, 0), z_dir=(0, 0, -1))):
        with Locations((3.767390026, 88.051603416)):
            Rectangle(SKETCH_19_W_2, SKETCH_19_H_4)
    extrude(amount=-CUT_EXTRUDE_6_DEPTH, mode=Mode.SUBTRACT)


solid = part_1.part
